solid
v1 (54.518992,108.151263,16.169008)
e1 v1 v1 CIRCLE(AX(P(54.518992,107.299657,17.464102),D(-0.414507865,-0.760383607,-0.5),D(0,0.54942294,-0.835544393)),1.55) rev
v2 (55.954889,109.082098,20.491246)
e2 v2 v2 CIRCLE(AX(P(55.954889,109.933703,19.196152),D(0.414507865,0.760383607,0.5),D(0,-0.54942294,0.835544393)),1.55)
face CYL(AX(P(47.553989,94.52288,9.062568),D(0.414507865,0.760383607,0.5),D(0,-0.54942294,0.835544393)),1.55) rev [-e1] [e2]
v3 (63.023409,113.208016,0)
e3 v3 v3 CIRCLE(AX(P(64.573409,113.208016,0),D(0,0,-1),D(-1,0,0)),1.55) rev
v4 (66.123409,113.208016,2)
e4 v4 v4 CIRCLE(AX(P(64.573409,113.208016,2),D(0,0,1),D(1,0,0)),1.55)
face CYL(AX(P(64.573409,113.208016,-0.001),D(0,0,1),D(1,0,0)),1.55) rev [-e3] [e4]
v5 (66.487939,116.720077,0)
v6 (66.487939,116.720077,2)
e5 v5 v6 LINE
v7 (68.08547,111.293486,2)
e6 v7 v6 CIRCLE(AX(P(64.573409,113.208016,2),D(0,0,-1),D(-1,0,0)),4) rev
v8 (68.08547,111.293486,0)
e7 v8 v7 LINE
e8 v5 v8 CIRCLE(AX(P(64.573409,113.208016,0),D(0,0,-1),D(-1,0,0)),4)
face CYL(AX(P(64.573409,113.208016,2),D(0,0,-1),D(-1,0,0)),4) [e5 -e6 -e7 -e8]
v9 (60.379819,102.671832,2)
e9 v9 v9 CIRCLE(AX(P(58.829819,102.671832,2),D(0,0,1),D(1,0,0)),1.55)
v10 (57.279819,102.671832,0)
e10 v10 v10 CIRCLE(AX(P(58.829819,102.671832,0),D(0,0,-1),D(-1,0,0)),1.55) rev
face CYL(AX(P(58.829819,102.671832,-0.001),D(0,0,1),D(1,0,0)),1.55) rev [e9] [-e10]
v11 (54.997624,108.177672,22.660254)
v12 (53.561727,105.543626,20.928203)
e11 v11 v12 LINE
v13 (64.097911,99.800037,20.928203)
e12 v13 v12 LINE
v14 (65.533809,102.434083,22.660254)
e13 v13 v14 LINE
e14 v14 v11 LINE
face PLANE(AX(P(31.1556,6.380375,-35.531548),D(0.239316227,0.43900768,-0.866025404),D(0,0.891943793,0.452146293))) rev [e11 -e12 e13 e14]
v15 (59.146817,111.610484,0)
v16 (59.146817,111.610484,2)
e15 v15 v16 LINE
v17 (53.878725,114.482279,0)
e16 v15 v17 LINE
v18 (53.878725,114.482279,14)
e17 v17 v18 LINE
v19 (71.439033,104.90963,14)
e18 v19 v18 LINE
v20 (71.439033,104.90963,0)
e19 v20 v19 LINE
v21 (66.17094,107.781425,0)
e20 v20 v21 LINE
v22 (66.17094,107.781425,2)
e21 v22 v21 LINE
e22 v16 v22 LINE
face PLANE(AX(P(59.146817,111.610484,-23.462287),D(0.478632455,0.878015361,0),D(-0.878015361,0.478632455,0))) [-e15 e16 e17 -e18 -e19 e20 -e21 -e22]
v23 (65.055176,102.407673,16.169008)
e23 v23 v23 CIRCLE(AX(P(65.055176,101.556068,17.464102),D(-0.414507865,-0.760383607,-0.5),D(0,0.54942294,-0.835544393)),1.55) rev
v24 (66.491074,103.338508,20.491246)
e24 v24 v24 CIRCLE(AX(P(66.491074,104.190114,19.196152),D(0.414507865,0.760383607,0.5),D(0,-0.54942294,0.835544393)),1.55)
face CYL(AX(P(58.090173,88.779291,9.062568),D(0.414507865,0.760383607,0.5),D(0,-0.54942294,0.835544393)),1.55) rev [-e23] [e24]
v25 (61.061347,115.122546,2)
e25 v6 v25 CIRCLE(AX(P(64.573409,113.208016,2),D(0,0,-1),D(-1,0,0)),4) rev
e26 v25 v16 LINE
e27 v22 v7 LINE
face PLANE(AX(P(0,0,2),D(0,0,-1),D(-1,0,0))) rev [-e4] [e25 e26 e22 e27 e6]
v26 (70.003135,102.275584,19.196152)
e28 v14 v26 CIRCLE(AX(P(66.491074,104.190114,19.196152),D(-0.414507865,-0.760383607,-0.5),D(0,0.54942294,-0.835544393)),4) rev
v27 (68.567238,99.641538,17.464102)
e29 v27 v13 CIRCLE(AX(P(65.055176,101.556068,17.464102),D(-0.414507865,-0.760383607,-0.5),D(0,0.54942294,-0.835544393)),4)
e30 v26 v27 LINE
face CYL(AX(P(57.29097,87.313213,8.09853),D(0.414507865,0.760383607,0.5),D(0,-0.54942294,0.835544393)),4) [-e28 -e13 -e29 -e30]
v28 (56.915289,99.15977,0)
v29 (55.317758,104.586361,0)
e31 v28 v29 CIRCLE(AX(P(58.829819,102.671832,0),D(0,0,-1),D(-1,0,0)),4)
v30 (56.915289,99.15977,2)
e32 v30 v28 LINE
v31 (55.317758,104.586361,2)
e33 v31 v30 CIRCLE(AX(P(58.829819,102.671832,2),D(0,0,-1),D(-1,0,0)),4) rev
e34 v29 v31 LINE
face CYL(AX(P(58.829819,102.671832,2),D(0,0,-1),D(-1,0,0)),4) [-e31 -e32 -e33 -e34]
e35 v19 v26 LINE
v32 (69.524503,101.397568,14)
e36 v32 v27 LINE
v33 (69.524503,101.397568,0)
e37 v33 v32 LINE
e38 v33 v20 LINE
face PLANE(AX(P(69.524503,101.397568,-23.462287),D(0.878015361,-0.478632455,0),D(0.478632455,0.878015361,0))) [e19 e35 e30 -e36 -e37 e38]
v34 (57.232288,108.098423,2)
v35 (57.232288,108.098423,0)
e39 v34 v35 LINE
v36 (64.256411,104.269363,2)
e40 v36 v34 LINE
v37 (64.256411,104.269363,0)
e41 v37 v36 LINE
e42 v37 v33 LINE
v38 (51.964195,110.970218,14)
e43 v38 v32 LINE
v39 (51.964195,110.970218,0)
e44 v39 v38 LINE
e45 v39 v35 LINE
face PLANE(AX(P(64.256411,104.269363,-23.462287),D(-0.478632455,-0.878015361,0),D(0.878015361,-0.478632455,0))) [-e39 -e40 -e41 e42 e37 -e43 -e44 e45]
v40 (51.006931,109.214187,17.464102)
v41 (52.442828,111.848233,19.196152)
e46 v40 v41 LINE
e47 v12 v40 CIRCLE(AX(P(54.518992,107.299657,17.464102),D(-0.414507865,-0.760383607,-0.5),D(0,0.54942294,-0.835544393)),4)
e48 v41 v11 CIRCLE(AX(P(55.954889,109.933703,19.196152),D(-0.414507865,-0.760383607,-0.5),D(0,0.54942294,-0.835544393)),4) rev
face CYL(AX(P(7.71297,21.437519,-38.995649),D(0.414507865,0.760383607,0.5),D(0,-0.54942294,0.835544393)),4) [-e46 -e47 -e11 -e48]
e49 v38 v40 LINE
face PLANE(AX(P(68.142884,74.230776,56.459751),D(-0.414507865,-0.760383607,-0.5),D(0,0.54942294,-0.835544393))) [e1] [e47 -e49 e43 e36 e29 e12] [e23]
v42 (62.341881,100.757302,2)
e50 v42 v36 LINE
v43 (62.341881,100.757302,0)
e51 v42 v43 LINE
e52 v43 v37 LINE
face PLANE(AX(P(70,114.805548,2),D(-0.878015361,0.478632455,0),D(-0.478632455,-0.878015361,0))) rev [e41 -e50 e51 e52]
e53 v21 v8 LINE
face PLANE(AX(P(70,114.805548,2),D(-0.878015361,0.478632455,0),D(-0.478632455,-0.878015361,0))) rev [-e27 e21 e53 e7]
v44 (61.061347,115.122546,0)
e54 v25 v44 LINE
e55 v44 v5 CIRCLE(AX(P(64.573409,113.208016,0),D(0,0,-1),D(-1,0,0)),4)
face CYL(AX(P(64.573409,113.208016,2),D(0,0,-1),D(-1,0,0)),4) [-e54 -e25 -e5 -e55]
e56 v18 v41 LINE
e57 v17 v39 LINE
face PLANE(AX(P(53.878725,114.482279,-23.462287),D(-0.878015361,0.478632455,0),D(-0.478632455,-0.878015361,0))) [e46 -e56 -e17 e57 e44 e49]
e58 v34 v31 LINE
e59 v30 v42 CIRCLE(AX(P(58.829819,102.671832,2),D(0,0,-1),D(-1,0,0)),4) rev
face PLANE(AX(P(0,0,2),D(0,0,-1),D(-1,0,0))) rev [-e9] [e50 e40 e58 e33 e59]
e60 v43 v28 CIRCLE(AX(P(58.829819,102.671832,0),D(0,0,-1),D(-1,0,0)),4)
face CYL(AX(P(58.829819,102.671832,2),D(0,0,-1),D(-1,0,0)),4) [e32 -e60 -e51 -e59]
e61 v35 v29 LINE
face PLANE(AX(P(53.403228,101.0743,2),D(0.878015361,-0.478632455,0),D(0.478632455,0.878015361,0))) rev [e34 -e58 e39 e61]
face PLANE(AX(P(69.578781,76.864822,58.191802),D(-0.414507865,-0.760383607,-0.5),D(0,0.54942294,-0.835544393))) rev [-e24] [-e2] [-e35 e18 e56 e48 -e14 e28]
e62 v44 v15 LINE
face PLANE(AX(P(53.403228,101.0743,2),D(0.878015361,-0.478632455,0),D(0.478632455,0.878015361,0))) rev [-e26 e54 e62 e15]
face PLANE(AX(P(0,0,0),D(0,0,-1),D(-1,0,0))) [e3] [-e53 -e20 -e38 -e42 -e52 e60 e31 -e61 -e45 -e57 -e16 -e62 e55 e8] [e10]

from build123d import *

# Parameters (mm, degrees)
BOSS_EXTRUDE1_DEPTH             = 2
FILLET1_R                       = 4
CUT_EXTRUDE1_REACH              = 137.809
SKETCH2_R                       = 1.55
BOSS_EXTRUDE2_DEPTH             = 12
BOSS_EXTRUDE2_DIRECTION_2_REACH = 137.809
BOSS_EXTRUDE3_DEPTH             = 20
FILLET2_R                       = 4
CUT_EXTRUDE2_REACH              = 70.911
SKETCH5_R                       = 1.55


with BuildPart() as part:
    # Sketch1 → Boss-Extrude1 (new body)
    with BuildSketch(Plane.XY):
        Polygon((70, 114.805547545), (60.427350908, 97.245240333), (53.403228024, 101.07429997), (62.975877115, 118.634607181), align=None)
    extrude(amount=BOSS_EXTRUDE1_DEPTH)

    # Fillet1
    fillet1_edges = [part.edges().sort_by_distance(p)[0] for p in [
        (60.427350908, 97.245240333, 1),
        (53.403228024, 101.07429997, 1),
        (70, 114.805547545, 1),
        (62.975877115, 118.634607181, 1),
    ]]
    fillet(fillet1_edges, radius=FILLET1_R - 0.0001)  # a hair under: the kernel refuses the full size

    # Sketch2 → Cut-Extrude1 (cut, up to next)
    with BuildSketch(Plane.XY.offset(2), mode=Mode.PRIVATE) as cut_extrude1_sk1:
        with Locations((64.573408739, 113.208015921)):
            Circle(SKETCH2_R)
    cut_extrude1_tool1 = extrude(cut_extrude1_sk1.sketch, amount=-CUT_EXTRUDE1_REACH, mode=Mode.PRIVATE) & part.part
    # Sketch2 → Cut-Extrude1 (cut, up to next)
    with BuildSketch(Plane.XY.offset(2), mode=Mode.PRIVATE) as cut_extrude1_sk2:
        with Locations((58.829819284, 102.671831594)):
            Circle(SKETCH2_R)
    cut_extrude1_tool2 = extrude(cut_extrude1_sk2.sketch, amount=-CUT_EXTRUDE1_REACH, mode=Mode.PRIVATE) & part.part
    add(cut_extrude1_tool1.solids().sort_by_distance((64.573409, 113.208016, 2))[0], mode=Mode.SUBTRACT)
    add(cut_extrude1_tool2.solids().sort_by_distance((58.829819, 102.671832, 2))[0], mode=Mode.SUBTRACT)

    # Sketch3 → Boss-Extrude2 (add)
    with BuildSketch(Plane.XY.offset(2)):
        Polygon((66.170940363, 107.78142466), (59.146817479, 111.610484297), (53.878725315, 114.482279024), (51.964195497, 110.970217582), (57.23228766, 108.098422855), (64.256410545, 104.269363218), (69.524502708, 101.39756849), (71.439032527, 104.909629933), align=None)
    extrude(amount=BOSS_EXTRUDE2_DEPTH)

    # Boss-Extrude2 direction 2: up to this face of the body (flat: up to its plane)
    boss_extrude2_direction_2_end = Plane(part.part.faces().sort_by_distance((61.701614012, 107.939923757, 0))[0])
    # Sketch3 → Boss-Extrude2 direction 2 (add, up to the picked face)
    with BuildSketch(Plane.XY.offset(2), mode=Mode.PRIVATE) as boss_extrude2_direction_2_sk1:
        Polygon((66.170940363, 107.78142466), (59.146817479, 111.610484297), (53.878725315, 114.482279024), (51.964195497, 110.970217582), (57.23228766, 108.098422855), (64.256410545, 104.269363218), (69.524502708, 101.39756849), (71.439032527, 104.909629933), align=None)
    boss_extrude2_direction_2_tool1 = split(extrude(boss_extrude2_direction_2_sk1.sketch, amount=-BOSS_EXTRUDE2_DIRECTION_2_REACH, mode=Mode.PRIVATE), bisect_by=boss_extrude2_direction_2_end, keep=Keep.BOTH, mode=Mode.PRIVATE)
    add(boss_extrude2_direction_2_tool1.solids().sort_by(Axis((61.701614, 107.939924, 2), (0, 0, -1)))[0])

    # Sketch4 → Boss-Extrude3 (add)
    with BuildSketch(Plane(origin=(-6.575093345, 3.584280194, 0), x_dir=(0, 0, 1), z_dir=(-0.8780153605811593, 0.4786324545865408, 0))):
        Polygon((22.660254038, 121.305306045), (20.92820323, 118.305306045), (14, 122.305306045), (14, 126.305306045), align=None)
    extrude(amount=-BOSS_EXTRUDE3_DEPTH)

    # Fillet2
    fillet2_edges = [part.edges().sort_by_distance(p)[0] for p in [
        (50.76761436, 108.775179181, 21.794228634),
        (68.327921572, 99.202530089, 21.794228634),
    ]]
    fillet(fillet2_edges, radius=FILLET2_R)

    # Sketch5 → Cut-Extrude2 (cut, up to next)
    with BuildSketch(Plane(origin=(48.241919048, 88.496184373, 58.191801834), x_dir=(0.9100457296544759, -0.34633972242186517, -0.22774012955647066), z_dir=(0.41450786474764584, 0.7603836071762374, 0.5000000000000009)), mode=Mode.PRIVATE) as cut_extrude2_sk1:
        with Locations(Location((8.475365681, 44.360860805, 0), (0, 0, 270))):
            Circle(SKETCH5_R)
    cut_extrude2_tool1 = extrude(cut_extrude2_sk1.sketch, amount=-CUT_EXTRUDE2_REACH, mode=Mode.PRIVATE) & part.part
    # Sketch5 → Cut-Extrude2 (cut, up to next)
    with BuildSketch(Plane(origin=(48.241919048, 88.496184373, 58.191801834), x_dir=(0.9100457296544759, -0.34633972242186517, -0.22774012955647066), z_dir=(0.41450786474764584, 0.7603836071762374, 0.5000000000000009)), mode=Mode.PRIVATE) as cut_extrude2_sk2:
        with Locations(Location((20.053008413, 41.205201002, 0), (0, 0, 270))):
            Circle(SKETCH5_R)
    cut_extrude2_tool2 = extrude(cut_extrude2_sk2.sketch, amount=-CUT_EXTRUDE2_REACH, mode=Mode.PRIVATE) & part.part
    add(cut_extrude2_tool1.solids().sort_by_distance((55.954889, 109.933703, 19.196152))[0], mode=Mode.SUBTRACT)
    add(cut_extrude2_tool2.solids().sort_by_distance((66.491074, 104.190114, 19.196152))[0], mode=Mode.SUBTRACT)


solid = part.part
